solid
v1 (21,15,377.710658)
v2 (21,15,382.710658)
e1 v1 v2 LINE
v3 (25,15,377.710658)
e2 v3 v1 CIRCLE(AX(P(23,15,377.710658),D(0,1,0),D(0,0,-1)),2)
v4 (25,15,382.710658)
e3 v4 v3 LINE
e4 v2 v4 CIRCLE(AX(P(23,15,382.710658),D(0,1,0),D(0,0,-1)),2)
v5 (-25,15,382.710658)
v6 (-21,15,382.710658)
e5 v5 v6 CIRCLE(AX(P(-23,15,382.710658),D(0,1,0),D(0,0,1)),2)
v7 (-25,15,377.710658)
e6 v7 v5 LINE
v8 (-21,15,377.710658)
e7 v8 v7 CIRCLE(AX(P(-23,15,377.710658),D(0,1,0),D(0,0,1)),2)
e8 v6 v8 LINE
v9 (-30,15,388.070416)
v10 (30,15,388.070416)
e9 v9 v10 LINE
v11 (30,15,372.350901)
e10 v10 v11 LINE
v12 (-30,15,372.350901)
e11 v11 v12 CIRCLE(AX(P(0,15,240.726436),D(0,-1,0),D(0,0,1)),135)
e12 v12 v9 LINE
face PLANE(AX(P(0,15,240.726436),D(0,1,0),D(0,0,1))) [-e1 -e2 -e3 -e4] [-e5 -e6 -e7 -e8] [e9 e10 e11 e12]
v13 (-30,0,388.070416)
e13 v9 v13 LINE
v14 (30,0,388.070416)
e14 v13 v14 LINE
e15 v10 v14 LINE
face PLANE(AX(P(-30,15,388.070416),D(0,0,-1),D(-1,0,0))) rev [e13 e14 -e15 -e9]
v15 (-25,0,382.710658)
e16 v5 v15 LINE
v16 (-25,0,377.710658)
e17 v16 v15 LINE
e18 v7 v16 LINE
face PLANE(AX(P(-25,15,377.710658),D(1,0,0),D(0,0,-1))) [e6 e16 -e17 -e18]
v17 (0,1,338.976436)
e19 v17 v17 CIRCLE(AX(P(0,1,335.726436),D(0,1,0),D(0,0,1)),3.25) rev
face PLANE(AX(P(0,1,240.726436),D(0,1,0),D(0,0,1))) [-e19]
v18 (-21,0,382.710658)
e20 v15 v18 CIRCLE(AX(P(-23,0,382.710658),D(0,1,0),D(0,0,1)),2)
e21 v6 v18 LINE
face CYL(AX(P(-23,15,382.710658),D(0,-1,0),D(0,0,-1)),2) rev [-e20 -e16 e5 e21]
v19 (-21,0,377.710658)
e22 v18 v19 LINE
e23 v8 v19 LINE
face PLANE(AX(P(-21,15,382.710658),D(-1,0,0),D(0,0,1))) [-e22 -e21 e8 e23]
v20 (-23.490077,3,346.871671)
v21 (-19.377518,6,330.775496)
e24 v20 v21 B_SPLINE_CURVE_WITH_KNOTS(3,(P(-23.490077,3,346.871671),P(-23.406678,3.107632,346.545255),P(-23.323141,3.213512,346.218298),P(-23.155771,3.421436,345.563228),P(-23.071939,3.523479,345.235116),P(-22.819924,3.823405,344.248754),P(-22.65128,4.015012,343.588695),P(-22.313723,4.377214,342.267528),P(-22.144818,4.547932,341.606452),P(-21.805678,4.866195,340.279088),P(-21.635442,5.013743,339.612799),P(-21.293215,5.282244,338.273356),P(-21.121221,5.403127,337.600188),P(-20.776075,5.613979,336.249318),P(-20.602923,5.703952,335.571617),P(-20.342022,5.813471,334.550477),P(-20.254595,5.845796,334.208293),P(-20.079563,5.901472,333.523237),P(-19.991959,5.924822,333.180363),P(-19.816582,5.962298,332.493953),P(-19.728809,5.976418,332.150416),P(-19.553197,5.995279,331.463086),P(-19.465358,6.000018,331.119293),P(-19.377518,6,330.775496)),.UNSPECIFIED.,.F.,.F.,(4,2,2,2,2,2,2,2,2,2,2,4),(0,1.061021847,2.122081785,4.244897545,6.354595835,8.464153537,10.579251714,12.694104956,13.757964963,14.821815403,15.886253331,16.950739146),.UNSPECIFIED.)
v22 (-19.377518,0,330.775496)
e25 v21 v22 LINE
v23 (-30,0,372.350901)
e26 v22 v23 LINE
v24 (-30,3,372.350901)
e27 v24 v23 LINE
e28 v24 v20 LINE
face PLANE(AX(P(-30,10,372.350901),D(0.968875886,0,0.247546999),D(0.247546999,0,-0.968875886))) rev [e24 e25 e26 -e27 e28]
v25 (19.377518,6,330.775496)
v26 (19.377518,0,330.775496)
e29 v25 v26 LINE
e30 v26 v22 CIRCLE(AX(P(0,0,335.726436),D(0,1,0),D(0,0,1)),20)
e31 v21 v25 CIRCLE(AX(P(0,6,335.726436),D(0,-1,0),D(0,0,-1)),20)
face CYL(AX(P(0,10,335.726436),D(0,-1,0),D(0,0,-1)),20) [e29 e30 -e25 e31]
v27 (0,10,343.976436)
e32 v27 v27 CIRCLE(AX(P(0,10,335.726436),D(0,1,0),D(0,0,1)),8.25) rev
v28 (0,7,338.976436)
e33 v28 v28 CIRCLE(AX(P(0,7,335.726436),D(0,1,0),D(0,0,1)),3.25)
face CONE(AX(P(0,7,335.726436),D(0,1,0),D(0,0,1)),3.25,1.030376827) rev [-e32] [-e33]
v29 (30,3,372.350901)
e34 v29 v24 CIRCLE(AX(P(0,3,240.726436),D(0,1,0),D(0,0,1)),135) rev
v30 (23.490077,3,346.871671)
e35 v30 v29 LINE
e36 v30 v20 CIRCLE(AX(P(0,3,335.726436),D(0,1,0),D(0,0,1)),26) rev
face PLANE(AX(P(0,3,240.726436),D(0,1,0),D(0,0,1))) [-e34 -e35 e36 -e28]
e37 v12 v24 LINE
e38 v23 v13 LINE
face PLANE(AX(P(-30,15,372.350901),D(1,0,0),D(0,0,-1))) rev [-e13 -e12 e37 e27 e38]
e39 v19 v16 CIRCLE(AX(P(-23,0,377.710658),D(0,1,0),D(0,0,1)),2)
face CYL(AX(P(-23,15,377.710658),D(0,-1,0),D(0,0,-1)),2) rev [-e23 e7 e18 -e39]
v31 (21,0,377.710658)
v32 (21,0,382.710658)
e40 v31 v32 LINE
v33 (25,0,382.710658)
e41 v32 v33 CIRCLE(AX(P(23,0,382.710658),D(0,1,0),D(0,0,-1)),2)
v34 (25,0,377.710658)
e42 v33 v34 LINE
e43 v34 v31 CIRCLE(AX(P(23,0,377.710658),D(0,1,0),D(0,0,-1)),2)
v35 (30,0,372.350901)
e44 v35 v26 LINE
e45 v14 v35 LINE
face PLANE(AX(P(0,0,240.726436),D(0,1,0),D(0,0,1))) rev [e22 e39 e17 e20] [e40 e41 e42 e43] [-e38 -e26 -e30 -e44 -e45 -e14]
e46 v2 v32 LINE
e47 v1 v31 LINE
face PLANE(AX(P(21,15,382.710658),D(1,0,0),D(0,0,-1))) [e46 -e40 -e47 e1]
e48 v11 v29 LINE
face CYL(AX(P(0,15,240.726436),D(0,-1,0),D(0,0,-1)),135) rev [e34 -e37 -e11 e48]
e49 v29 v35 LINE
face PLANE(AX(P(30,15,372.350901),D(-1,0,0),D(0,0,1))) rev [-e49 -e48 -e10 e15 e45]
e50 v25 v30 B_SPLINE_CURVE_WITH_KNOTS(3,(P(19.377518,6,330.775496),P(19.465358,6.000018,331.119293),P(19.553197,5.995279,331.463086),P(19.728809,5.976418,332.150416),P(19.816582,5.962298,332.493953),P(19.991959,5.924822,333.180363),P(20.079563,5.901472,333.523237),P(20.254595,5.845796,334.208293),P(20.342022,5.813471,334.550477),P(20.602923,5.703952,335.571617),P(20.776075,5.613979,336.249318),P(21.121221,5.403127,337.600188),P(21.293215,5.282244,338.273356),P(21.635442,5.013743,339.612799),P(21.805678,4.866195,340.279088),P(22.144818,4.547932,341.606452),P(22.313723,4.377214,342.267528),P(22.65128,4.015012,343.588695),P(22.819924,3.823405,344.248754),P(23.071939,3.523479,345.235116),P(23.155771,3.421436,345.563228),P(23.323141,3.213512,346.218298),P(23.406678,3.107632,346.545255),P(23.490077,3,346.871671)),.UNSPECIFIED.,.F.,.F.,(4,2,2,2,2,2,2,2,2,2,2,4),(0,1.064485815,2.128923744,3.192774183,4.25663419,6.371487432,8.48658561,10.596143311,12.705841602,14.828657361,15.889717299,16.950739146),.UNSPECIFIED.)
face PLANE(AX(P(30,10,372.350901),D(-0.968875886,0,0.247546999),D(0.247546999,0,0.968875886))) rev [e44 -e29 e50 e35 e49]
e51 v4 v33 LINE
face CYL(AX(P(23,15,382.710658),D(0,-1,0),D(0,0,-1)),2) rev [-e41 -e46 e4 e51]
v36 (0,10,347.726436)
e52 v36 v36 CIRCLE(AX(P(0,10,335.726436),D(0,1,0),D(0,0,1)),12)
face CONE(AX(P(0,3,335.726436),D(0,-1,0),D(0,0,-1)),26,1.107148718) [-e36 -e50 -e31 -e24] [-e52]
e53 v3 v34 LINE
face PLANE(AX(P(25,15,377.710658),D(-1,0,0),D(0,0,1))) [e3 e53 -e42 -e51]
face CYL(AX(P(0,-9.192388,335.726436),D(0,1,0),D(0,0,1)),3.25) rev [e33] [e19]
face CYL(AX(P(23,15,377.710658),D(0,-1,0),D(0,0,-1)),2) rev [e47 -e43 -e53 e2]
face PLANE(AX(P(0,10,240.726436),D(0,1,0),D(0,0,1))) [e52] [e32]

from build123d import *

# Parameters (mm, degrees)
BOSS_EXTRUDE1_DEPTH    = 15
BOSS_EXTRUDE2_DEPTH    = 10
SKETCH3_R              = 3.25
CUT_EXTRUDE1_DEPTH     = 9
CUT_EXTRUDE2_START     = -7
SKETCH4_R              = 6
CUT_EXTRUDE2_DEPTH     = 7
CHAMFER1_START         = 3
CHAMFER1_2_DEPTH       = 7
CHAMFER1_3_OUTLINE_R   = 12
CHAMFER1_3_OUTLINE_R_2 = 6
CHAMFER1_3_DEPTH       = 7
CHAMFER2_SIZE          = 5
CHAMFER2_SIZE2         = 3


with BuildPart() as part:
    # Sketch1 → Boss-Extrude1 (new body)
    with BuildSketch(Plane(origin=(0, 0, 0), x_dir=(1, 0, 0), z_dir=(0, 1, 0))):
        with BuildLine():
            Line((-30, -388.070415552), (30, -388.070415552))
            Line((30, -388.070415552), (30, -372.350901436))
            ThreePointArc((30, -372.350901436), (0, -375.726435625), (-30, -372.350901436))
            Line((-30, -372.350901436), (-30, -388.070415552))
        make_face()
        with BuildLine():
            Line((-21, -382.710658494), (-21, -377.710658494))
            ThreePointArc((-21, -377.710658494), (-23, -375.710658494), (-25, -377.710658494))
            Line((-25, -377.710658494), (-25, -382.710658494))
            ThreePointArc((-25, -382.710658494), (-23, -384.710658494), (-21, -382.710658494))
        make_face(mode=Mode.SUBTRACT)
        with BuildLine():
            Line((25, -377.710658494), (25, -382.710658494))
            ThreePointArc((25, -382.710658494), (23, -384.710658494), (21, -382.710658494))
            Line((21, -382.710658494), (21, -377.710658494))
            ThreePointArc((21, -377.710658494), (23, -375.710658494), (25, -377.710658494))
        make_face(mode=Mode.SUBTRACT)
    extrude(amount=BOSS_EXTRUDE1_DEPTH)

    # Sketch2 → Boss-Extrude2 (add)
    with BuildSketch(Plane(origin=(0, 0, 0), x_dir=(1, 0, 0), z_dir=(0, 1, 0))):
        with BuildLine():
            Line((30, -372.350901436), (19.377517729, -330.775495649))
            ThreePointArc((19.377517729, -330.775495649), (0, -315.726435625), (-19.377517729, -330.775495649))
            Line((-19.377517729, -330.775495649), (-30, -372.350901436))
            ThreePointArc((-30, -372.350901436), (0, -375.726435625), (30, -372.350901436))
        make_face()
    extrude(amount=BOSS_EXTRUDE2_DEPTH)

    # Sketch3 → Cut-Extrude1 (cut)
    with BuildSketch(Plane(origin=(0, 10, 0), x_dir=(1, 0, 0), z_dir=(0, 1, 0))):
        with Locations(Location((0, -335.726435625, 0), (0, 0, 270))):
            Circle(SKETCH3_R)
    extrude(amount=-CUT_EXTRUDE1_DEPTH, mode=Mode.SUBTRACT)

    # Sketch4 → Cut-Extrude2 (cut)
    with BuildSketch(Plane(origin=(0, 10, 0), x_dir=(1, 0, 0), z_dir=(0, 1, 0)).offset(CUT_EXTRUDE2_START)):
        with BuildLine():
            Line((30, -372.350901436), (19.377517729, -330.775495649))
            ThreePointArc((19.377517729, -330.775495649), (0, -315.726435625), (-19.377517729, -330.775495649))
            Line((-19.377517729, -330.775495649), (-30, -372.350901436))
            ThreePointArc((-30, -372.350901436), (0, -375.726435625), (30, -372.350901436))
        make_face()
        with Locations(Location((0, -335.726435625, 0), (0, 0, 270))):
            Circle(SKETCH4_R, mode=Mode.SUBTRACT)
    extrude(amount=CUT_EXTRUDE2_DEPTH, mode=Mode.SUBTRACT)

    # Chamfer1: read off the stored shape, not the designer's step
    # Chamfer1 outline → Chamfer1 (revolve)
    with BuildSketch(Plane.XY.offset(335.726435625)):
        Polygon((26, 3), (12, 10), (12, 3), align=None)
    revolve(axis=Axis((0, 0, 335.726435625), (0, 1, 0)))

    # Chamfer1 2 outline → Chamfer1 2 (cut)
    with BuildSketch(Plane(origin=(0, 0, 0), x_dir=(1, 0, 0), z_dir=(0, 1, 0)).offset(CHAMFER1_START)):
        with BuildLine():
            ThreePointArc((-19.377517729, -330.775495649), (0, -315.726435625), (19.377517729, -330.775495649))
            Line((19.377517729, -330.775495649), (24.033863727, -349))
            Line((24.033863727, -349), (27, -349))
            Line((27, -349), (27, -308))
            Line((27, -308), (-27, -308))
            Line((-27, -308), (-27, -349))
            Line((-27, -349), (-24.033863727, -349))
            Line((-24.033863727, -349), (-19.377517729, -330.775495649))
        make_face()
    extrude(amount=CHAMFER1_2_DEPTH, mode=Mode.SUBTRACT)

    # Chamfer1 3 outline → Chamfer1 3 (add)
    with BuildSketch(Plane(origin=(0, 0, 0), x_dir=(1, 0, 0), z_dir=(0, 1, 0)).offset(CHAMFER1_START)):
        with Locations((0, -335.726435625)):
            Circle(CHAMFER1_3_OUTLINE_R)
        with Locations((0, -335.726435625)):
            Circle(CHAMFER1_3_OUTLINE_R_2, mode=Mode.SUBTRACT)
    extrude(amount=CHAMFER1_3_DEPTH)

    # Chamfer2
    chamfer2_edges = [part.edges().sort_by_distance(p)[0] for p in [
        (0, 10, 332.476435625),
    ]]
    chamfer2_side = [part.faces().sort_by_distance(p)[0] for p in [
        (-11.660588745, 10, 335.726435625),
    ]]
    chamfer(chamfer2_edges, length=CHAMFER2_SIZE, length2=CHAMFER2_SIZE2, reference=chamfer2_side[0])


solid = part.part
